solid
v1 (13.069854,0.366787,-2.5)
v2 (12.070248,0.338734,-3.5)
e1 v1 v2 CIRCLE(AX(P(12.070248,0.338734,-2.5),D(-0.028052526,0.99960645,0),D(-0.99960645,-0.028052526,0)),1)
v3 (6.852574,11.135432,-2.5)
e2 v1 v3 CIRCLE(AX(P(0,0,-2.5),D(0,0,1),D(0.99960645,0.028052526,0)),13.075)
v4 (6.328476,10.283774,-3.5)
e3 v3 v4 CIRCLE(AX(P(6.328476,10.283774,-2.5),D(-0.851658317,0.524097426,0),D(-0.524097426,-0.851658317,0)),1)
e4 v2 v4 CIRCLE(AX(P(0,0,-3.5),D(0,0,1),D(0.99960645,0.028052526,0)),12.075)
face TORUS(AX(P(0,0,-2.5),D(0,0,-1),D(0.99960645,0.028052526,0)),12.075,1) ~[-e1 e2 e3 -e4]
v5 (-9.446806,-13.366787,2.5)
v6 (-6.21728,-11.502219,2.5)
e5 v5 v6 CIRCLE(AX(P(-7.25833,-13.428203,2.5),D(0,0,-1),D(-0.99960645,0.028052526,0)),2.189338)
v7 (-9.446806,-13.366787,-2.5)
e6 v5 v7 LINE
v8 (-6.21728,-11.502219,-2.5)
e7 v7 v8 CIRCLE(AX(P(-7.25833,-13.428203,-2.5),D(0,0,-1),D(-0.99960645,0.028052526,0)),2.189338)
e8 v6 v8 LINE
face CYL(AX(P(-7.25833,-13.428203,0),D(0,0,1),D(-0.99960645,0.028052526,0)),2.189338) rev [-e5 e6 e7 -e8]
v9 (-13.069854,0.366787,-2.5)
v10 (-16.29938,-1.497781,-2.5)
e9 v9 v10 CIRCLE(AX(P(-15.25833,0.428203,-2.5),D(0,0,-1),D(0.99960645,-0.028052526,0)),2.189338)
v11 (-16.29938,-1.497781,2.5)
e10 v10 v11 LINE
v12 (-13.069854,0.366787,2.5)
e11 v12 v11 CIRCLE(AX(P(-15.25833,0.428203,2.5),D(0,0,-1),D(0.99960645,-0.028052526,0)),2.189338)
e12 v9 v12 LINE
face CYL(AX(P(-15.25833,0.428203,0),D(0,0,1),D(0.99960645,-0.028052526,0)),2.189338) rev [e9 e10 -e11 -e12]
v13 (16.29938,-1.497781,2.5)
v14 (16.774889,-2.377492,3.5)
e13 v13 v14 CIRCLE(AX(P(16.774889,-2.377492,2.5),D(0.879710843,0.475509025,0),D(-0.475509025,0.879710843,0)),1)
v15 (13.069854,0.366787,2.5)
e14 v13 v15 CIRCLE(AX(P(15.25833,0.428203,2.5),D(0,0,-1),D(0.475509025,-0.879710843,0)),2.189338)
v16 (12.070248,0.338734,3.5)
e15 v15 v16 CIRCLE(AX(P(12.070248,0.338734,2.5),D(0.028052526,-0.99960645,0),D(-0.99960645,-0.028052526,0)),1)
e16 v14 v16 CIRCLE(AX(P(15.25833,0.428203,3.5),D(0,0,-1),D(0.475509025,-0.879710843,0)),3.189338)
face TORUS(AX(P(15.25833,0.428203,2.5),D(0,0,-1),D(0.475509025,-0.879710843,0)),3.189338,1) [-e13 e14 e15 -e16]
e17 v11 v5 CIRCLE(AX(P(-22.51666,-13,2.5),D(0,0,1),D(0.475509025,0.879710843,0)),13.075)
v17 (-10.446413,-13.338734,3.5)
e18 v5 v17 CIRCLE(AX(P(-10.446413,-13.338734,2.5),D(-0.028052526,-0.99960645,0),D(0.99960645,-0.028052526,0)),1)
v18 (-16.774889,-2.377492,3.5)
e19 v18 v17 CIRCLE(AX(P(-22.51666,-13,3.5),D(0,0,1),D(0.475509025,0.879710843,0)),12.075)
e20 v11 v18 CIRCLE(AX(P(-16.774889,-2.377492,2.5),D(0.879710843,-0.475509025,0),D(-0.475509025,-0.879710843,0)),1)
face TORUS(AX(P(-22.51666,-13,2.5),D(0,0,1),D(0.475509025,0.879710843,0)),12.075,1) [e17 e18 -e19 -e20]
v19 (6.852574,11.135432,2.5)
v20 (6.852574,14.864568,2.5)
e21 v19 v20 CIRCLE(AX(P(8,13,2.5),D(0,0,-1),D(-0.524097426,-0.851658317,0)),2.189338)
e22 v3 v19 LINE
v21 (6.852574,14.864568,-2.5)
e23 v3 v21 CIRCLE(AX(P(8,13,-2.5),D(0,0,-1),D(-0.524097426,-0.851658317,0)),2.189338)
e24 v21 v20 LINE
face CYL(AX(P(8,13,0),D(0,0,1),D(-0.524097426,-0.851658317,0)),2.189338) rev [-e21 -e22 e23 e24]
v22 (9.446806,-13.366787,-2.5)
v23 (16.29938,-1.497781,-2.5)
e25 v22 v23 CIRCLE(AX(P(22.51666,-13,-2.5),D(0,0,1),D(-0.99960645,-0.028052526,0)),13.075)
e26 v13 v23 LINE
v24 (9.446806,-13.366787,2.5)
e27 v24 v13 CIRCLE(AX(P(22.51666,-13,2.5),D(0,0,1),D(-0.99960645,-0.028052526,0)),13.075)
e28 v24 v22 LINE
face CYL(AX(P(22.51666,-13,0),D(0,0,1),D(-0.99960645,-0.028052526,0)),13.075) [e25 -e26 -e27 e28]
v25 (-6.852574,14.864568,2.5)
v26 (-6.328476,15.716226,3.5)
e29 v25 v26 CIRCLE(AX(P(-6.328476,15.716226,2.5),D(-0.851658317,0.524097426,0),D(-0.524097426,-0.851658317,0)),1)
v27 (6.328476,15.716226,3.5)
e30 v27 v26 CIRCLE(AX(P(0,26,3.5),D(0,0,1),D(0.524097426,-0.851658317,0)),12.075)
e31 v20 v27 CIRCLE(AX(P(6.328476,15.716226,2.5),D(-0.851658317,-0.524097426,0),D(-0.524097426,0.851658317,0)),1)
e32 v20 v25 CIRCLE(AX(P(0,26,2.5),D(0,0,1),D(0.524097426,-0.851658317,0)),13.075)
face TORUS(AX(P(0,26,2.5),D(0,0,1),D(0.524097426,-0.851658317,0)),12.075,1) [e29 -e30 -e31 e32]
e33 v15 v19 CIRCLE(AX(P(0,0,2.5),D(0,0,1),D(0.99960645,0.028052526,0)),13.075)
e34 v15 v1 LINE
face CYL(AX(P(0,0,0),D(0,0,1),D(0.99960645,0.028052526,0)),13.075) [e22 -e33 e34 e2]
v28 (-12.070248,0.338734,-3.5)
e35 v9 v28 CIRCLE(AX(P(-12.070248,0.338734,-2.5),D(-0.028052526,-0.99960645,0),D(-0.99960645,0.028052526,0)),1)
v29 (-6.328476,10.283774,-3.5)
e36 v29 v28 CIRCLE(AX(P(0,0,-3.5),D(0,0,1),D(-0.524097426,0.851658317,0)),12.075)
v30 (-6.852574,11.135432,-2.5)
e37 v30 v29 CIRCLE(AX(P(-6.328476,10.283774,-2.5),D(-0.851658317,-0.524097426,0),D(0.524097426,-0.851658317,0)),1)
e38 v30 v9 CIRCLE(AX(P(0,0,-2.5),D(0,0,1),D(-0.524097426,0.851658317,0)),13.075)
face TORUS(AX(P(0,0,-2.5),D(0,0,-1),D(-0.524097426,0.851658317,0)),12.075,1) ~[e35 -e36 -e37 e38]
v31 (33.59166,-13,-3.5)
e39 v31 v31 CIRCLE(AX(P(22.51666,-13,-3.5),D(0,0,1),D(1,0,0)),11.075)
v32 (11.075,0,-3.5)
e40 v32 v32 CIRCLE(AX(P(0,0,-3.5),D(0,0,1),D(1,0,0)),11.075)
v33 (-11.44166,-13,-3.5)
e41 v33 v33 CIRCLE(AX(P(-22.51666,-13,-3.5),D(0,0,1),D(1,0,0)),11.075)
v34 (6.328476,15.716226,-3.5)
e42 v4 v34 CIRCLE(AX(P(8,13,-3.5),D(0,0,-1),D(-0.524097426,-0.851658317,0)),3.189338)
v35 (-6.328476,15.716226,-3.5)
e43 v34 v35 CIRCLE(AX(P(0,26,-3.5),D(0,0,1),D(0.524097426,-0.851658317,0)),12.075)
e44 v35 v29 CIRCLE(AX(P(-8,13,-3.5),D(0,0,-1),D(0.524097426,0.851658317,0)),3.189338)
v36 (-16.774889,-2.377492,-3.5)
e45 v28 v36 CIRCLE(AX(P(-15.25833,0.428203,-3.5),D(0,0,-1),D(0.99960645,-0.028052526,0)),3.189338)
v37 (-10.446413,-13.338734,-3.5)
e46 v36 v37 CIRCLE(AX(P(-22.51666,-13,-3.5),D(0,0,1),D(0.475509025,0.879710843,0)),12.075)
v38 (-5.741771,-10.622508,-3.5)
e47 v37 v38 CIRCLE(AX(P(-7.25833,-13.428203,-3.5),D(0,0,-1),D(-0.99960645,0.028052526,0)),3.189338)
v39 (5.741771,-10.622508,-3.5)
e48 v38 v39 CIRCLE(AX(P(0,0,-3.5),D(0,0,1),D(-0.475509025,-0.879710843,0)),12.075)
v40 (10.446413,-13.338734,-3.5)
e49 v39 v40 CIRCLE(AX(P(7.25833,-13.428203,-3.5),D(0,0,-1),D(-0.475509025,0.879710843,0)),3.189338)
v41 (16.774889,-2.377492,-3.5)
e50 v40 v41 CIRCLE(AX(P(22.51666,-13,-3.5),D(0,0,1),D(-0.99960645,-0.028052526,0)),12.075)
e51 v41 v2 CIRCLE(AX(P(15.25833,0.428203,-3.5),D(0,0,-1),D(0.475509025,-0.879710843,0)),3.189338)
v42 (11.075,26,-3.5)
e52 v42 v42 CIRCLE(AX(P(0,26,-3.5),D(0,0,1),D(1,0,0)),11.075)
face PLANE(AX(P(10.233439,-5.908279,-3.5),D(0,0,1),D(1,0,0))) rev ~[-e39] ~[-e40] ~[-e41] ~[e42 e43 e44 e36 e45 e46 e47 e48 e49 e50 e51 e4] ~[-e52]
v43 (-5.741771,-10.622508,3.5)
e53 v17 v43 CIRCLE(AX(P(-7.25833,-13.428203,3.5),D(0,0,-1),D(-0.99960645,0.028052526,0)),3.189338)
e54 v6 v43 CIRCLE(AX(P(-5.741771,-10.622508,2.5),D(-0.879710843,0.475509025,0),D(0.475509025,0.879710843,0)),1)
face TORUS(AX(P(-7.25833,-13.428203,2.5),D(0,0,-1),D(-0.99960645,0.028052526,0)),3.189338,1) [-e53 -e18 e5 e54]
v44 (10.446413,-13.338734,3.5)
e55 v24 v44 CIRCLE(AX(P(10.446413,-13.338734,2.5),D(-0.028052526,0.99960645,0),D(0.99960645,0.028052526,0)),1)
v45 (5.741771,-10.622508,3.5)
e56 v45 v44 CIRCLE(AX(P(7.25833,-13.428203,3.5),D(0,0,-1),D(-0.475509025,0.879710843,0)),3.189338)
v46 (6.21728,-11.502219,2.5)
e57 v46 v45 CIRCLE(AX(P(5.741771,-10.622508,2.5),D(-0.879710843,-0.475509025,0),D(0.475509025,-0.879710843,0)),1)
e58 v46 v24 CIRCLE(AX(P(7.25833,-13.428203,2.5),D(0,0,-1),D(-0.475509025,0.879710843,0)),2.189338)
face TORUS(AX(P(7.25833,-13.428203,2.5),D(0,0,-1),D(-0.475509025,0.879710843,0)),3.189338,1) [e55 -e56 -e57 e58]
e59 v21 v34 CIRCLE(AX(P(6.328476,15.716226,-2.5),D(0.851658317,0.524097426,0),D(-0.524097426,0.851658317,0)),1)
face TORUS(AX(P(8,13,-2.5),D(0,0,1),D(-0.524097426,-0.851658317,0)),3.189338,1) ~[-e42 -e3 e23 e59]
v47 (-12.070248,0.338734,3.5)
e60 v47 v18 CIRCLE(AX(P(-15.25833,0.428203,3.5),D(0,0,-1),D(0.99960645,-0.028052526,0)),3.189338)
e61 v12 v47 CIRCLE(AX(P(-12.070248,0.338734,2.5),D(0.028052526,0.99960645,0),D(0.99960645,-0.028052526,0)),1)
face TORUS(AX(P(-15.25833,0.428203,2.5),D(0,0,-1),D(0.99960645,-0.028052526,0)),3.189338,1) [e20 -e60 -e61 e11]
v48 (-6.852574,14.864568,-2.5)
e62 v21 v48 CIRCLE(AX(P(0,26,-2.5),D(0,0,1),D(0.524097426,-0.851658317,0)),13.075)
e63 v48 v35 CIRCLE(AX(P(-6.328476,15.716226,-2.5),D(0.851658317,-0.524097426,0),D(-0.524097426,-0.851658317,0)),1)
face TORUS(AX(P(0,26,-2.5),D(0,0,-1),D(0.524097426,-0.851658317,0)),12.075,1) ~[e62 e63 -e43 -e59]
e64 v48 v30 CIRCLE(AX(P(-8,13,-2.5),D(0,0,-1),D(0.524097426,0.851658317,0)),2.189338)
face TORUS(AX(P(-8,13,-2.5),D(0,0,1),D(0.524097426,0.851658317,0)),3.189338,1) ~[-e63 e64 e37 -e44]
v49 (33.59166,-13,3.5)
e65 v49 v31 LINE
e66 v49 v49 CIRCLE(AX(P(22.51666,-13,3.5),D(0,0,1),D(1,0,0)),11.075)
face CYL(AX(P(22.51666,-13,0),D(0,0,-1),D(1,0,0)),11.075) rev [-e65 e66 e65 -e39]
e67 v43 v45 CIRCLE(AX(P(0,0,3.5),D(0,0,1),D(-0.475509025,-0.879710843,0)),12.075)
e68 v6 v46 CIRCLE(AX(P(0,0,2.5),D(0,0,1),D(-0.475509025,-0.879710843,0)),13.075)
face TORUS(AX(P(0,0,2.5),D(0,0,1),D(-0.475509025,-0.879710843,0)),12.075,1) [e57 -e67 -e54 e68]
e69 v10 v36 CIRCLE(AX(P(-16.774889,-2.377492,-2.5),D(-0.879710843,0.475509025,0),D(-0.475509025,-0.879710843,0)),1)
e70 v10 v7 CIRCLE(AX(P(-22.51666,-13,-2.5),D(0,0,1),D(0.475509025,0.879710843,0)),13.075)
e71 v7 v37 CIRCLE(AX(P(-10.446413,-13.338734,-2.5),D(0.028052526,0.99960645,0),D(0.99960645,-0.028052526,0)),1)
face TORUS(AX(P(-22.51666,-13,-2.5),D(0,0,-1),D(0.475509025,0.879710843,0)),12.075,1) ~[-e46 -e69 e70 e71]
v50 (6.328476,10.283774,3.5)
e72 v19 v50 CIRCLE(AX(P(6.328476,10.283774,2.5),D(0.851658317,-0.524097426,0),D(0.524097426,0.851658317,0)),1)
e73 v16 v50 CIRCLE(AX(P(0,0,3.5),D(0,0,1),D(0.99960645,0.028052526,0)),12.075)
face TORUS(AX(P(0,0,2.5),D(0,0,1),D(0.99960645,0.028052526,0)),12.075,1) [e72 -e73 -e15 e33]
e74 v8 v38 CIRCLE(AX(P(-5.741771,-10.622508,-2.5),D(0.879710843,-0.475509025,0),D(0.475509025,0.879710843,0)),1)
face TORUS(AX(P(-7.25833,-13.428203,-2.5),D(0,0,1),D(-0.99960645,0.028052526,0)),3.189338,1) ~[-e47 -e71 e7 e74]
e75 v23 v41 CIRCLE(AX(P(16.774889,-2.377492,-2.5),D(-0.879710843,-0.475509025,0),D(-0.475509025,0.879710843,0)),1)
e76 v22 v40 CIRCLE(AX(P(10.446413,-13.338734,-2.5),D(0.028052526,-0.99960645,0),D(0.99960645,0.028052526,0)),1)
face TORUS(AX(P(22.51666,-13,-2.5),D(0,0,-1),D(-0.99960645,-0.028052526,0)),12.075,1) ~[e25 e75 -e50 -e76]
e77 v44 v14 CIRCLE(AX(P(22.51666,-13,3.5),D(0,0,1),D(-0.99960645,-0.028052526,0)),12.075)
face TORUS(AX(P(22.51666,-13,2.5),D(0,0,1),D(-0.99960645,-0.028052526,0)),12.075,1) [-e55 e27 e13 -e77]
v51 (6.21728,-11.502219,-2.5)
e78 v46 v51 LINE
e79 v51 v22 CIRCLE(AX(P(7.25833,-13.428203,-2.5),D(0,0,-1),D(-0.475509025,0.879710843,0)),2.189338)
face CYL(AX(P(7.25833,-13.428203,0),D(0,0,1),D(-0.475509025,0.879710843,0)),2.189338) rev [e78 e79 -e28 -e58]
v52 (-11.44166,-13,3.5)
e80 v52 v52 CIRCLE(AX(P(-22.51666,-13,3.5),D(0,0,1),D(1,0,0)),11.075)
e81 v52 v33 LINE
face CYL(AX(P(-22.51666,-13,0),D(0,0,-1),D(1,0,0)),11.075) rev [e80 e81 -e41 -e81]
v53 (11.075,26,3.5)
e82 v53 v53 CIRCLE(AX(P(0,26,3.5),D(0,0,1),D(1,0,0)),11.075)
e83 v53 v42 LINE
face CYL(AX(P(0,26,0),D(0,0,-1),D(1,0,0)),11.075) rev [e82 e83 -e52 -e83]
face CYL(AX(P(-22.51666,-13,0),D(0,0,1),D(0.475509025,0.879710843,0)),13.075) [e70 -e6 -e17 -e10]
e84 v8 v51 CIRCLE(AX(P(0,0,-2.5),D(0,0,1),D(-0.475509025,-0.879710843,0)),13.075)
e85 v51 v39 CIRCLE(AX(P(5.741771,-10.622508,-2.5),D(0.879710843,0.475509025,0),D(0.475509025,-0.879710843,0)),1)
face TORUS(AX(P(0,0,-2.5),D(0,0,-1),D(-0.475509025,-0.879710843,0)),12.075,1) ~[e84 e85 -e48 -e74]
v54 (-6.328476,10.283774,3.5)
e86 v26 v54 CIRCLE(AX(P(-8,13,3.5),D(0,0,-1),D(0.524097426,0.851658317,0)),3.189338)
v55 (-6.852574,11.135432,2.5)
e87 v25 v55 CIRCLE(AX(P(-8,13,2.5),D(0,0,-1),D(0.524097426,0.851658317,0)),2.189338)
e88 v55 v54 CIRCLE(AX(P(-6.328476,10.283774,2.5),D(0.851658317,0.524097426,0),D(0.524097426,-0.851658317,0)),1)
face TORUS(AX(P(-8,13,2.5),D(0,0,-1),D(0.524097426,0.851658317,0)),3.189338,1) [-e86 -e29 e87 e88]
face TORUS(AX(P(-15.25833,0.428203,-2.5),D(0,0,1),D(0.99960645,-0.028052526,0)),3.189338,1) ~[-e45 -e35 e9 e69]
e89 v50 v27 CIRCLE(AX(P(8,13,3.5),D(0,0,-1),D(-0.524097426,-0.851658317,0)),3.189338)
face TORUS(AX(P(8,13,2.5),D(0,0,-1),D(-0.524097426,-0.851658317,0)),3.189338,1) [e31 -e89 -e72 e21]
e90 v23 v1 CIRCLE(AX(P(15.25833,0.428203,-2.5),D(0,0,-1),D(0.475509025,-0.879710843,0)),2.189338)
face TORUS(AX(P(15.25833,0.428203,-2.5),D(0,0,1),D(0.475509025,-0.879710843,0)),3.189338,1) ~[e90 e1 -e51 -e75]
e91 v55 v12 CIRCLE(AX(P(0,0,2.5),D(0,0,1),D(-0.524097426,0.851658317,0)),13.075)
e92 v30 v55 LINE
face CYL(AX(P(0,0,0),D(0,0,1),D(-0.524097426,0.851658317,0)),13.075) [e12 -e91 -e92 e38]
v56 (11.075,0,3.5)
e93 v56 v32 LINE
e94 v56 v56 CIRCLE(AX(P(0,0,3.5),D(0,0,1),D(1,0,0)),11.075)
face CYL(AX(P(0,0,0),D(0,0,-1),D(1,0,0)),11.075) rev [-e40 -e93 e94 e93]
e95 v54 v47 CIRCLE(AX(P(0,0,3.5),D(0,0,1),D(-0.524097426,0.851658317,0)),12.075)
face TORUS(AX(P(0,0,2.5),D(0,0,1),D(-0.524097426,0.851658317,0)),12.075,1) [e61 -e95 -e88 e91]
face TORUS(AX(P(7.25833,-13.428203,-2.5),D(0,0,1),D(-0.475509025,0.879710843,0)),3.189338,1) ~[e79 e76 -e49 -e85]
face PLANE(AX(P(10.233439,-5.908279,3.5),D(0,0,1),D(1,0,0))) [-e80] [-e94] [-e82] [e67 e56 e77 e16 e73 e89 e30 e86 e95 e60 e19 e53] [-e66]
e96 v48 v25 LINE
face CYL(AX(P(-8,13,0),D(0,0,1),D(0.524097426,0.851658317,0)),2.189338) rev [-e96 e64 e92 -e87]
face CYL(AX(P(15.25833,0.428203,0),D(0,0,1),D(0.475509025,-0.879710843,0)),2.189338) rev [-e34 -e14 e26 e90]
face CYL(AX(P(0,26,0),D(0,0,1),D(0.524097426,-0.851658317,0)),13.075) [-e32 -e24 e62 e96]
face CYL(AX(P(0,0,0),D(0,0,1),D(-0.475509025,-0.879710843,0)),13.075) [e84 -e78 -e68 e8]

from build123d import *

# Parameters (mm, degrees)
F0_R     = 11.075
F1_DEPTH = 3.5
F2_R     = 1


# Not quite as in the source:
# - a feature names something its author has since deleted; it is built from what else it names


with BuildPart() as f1:
    # F0 (on Top) → F1 (new body, symmetric)
    with BuildSketch(Plane.XY):
        with BuildLine():
            ThreePointArc((6.8525738406, 11.1354324909), (0, 13.075), (-6.8525738406, 11.1354324909))
            ThreePointArc((-6.8525738406, 11.1354324909), (-11.3232821545, 6.5375), (-13.0698543395, 0.3667867818))
            ThreePointArc((-13.0698543395, 0.3667867818), (-11.3232821545, -6.5375), (-6.217280499, -11.5022192727))
            ThreePointArc((-6.217280499, -11.5022192727), (0, -13.075), (6.217280499, -11.5022192727))
            ThreePointArc((6.217280499, -11.5022192727), (8.3529990104, -11.5321813184), (9.4468061589, -13.3667867818))
            ThreePointArc((9.4468061589, -13.3667867818), (33.8399426529, -19.5375), (16.2993799994, -1.4977807273))
            ThreePointArc((16.2993799994, -1.4977807273), (14.163661488, -1.4678186816), (13.0698543395, 0.3667867818))
            ThreePointArc((13.0698543395, 0.3667867818), (11.3232821545, 6.5375), (6.8525738406, 11.1354324909))
        make_face()
        with Locations((22.5166604984, -13)):
            Circle(F0_R, mode=Mode.SUBTRACT)
        Circle(F0_R, mode=Mode.SUBTRACT)
        with BuildLine():
            ThreePointArc((-6.8525738406, 14.8645675091), (-5.8106624775, 13), (-6.8525738406, 11.1354324909))
            ThreePointArc((-6.8525738406, 11.1354324909), (0, 13.075), (6.8525738406, 11.1354324909))
            ThreePointArc((6.8525738406, 11.1354324909), (5.8106624775, 13), (6.8525738406, 14.8645675091))
            ThreePointArc((6.8525738406, 14.8645675091), (0, 39.075), (-6.8525738406, 14.8645675091))
        make_face()
        with Locations((0, 26)):
            Circle(F0_R, mode=Mode.SUBTRACT)
        with BuildLine():
            ThreePointArc((-6.217280499, -11.5022192727), (-11.3232821545, -6.5375), (-13.0698543395, 0.3667867818))
            ThreePointArc((-13.0698543395, 0.3667867818), (-14.163661488, -1.4678186816), (-16.2993799994, -1.4977807273))
            ThreePointArc((-16.2993799994, -1.4977807273), (-33.8399426529, -19.5375), (-9.4468061589, -13.3667867818))
            ThreePointArc((-9.4468061589, -13.3667867818), (-8.3529990104, -11.5321813184), (-6.217280499, -11.5022192727))
        make_face()
        with Locations((-22.5166604984, -13)):
            Circle(F0_R, mode=Mode.SUBTRACT)
    extrude(amount=F1_DEPTH, both=True)

    # F2
    f2_edges = [f1.edges().sort_by_distance(p)[0] for p in [
        (-14.163661, -1.467819, 3.5),
        (5.810662, 13, -3.5),
        (-5.810662, 13, 3.5),
        (-8.352999, -11.532181, 3.5),
        (5.810662, 13, 3.5),
        (-5.810662, 13, -3.5),
        (-14.163661, -1.467819, -3.5),
        (-8.352999, -11.532181, -3.5),
    ]]
    fillet(f2_edges, radius=F2_R)


solid = f1.part
